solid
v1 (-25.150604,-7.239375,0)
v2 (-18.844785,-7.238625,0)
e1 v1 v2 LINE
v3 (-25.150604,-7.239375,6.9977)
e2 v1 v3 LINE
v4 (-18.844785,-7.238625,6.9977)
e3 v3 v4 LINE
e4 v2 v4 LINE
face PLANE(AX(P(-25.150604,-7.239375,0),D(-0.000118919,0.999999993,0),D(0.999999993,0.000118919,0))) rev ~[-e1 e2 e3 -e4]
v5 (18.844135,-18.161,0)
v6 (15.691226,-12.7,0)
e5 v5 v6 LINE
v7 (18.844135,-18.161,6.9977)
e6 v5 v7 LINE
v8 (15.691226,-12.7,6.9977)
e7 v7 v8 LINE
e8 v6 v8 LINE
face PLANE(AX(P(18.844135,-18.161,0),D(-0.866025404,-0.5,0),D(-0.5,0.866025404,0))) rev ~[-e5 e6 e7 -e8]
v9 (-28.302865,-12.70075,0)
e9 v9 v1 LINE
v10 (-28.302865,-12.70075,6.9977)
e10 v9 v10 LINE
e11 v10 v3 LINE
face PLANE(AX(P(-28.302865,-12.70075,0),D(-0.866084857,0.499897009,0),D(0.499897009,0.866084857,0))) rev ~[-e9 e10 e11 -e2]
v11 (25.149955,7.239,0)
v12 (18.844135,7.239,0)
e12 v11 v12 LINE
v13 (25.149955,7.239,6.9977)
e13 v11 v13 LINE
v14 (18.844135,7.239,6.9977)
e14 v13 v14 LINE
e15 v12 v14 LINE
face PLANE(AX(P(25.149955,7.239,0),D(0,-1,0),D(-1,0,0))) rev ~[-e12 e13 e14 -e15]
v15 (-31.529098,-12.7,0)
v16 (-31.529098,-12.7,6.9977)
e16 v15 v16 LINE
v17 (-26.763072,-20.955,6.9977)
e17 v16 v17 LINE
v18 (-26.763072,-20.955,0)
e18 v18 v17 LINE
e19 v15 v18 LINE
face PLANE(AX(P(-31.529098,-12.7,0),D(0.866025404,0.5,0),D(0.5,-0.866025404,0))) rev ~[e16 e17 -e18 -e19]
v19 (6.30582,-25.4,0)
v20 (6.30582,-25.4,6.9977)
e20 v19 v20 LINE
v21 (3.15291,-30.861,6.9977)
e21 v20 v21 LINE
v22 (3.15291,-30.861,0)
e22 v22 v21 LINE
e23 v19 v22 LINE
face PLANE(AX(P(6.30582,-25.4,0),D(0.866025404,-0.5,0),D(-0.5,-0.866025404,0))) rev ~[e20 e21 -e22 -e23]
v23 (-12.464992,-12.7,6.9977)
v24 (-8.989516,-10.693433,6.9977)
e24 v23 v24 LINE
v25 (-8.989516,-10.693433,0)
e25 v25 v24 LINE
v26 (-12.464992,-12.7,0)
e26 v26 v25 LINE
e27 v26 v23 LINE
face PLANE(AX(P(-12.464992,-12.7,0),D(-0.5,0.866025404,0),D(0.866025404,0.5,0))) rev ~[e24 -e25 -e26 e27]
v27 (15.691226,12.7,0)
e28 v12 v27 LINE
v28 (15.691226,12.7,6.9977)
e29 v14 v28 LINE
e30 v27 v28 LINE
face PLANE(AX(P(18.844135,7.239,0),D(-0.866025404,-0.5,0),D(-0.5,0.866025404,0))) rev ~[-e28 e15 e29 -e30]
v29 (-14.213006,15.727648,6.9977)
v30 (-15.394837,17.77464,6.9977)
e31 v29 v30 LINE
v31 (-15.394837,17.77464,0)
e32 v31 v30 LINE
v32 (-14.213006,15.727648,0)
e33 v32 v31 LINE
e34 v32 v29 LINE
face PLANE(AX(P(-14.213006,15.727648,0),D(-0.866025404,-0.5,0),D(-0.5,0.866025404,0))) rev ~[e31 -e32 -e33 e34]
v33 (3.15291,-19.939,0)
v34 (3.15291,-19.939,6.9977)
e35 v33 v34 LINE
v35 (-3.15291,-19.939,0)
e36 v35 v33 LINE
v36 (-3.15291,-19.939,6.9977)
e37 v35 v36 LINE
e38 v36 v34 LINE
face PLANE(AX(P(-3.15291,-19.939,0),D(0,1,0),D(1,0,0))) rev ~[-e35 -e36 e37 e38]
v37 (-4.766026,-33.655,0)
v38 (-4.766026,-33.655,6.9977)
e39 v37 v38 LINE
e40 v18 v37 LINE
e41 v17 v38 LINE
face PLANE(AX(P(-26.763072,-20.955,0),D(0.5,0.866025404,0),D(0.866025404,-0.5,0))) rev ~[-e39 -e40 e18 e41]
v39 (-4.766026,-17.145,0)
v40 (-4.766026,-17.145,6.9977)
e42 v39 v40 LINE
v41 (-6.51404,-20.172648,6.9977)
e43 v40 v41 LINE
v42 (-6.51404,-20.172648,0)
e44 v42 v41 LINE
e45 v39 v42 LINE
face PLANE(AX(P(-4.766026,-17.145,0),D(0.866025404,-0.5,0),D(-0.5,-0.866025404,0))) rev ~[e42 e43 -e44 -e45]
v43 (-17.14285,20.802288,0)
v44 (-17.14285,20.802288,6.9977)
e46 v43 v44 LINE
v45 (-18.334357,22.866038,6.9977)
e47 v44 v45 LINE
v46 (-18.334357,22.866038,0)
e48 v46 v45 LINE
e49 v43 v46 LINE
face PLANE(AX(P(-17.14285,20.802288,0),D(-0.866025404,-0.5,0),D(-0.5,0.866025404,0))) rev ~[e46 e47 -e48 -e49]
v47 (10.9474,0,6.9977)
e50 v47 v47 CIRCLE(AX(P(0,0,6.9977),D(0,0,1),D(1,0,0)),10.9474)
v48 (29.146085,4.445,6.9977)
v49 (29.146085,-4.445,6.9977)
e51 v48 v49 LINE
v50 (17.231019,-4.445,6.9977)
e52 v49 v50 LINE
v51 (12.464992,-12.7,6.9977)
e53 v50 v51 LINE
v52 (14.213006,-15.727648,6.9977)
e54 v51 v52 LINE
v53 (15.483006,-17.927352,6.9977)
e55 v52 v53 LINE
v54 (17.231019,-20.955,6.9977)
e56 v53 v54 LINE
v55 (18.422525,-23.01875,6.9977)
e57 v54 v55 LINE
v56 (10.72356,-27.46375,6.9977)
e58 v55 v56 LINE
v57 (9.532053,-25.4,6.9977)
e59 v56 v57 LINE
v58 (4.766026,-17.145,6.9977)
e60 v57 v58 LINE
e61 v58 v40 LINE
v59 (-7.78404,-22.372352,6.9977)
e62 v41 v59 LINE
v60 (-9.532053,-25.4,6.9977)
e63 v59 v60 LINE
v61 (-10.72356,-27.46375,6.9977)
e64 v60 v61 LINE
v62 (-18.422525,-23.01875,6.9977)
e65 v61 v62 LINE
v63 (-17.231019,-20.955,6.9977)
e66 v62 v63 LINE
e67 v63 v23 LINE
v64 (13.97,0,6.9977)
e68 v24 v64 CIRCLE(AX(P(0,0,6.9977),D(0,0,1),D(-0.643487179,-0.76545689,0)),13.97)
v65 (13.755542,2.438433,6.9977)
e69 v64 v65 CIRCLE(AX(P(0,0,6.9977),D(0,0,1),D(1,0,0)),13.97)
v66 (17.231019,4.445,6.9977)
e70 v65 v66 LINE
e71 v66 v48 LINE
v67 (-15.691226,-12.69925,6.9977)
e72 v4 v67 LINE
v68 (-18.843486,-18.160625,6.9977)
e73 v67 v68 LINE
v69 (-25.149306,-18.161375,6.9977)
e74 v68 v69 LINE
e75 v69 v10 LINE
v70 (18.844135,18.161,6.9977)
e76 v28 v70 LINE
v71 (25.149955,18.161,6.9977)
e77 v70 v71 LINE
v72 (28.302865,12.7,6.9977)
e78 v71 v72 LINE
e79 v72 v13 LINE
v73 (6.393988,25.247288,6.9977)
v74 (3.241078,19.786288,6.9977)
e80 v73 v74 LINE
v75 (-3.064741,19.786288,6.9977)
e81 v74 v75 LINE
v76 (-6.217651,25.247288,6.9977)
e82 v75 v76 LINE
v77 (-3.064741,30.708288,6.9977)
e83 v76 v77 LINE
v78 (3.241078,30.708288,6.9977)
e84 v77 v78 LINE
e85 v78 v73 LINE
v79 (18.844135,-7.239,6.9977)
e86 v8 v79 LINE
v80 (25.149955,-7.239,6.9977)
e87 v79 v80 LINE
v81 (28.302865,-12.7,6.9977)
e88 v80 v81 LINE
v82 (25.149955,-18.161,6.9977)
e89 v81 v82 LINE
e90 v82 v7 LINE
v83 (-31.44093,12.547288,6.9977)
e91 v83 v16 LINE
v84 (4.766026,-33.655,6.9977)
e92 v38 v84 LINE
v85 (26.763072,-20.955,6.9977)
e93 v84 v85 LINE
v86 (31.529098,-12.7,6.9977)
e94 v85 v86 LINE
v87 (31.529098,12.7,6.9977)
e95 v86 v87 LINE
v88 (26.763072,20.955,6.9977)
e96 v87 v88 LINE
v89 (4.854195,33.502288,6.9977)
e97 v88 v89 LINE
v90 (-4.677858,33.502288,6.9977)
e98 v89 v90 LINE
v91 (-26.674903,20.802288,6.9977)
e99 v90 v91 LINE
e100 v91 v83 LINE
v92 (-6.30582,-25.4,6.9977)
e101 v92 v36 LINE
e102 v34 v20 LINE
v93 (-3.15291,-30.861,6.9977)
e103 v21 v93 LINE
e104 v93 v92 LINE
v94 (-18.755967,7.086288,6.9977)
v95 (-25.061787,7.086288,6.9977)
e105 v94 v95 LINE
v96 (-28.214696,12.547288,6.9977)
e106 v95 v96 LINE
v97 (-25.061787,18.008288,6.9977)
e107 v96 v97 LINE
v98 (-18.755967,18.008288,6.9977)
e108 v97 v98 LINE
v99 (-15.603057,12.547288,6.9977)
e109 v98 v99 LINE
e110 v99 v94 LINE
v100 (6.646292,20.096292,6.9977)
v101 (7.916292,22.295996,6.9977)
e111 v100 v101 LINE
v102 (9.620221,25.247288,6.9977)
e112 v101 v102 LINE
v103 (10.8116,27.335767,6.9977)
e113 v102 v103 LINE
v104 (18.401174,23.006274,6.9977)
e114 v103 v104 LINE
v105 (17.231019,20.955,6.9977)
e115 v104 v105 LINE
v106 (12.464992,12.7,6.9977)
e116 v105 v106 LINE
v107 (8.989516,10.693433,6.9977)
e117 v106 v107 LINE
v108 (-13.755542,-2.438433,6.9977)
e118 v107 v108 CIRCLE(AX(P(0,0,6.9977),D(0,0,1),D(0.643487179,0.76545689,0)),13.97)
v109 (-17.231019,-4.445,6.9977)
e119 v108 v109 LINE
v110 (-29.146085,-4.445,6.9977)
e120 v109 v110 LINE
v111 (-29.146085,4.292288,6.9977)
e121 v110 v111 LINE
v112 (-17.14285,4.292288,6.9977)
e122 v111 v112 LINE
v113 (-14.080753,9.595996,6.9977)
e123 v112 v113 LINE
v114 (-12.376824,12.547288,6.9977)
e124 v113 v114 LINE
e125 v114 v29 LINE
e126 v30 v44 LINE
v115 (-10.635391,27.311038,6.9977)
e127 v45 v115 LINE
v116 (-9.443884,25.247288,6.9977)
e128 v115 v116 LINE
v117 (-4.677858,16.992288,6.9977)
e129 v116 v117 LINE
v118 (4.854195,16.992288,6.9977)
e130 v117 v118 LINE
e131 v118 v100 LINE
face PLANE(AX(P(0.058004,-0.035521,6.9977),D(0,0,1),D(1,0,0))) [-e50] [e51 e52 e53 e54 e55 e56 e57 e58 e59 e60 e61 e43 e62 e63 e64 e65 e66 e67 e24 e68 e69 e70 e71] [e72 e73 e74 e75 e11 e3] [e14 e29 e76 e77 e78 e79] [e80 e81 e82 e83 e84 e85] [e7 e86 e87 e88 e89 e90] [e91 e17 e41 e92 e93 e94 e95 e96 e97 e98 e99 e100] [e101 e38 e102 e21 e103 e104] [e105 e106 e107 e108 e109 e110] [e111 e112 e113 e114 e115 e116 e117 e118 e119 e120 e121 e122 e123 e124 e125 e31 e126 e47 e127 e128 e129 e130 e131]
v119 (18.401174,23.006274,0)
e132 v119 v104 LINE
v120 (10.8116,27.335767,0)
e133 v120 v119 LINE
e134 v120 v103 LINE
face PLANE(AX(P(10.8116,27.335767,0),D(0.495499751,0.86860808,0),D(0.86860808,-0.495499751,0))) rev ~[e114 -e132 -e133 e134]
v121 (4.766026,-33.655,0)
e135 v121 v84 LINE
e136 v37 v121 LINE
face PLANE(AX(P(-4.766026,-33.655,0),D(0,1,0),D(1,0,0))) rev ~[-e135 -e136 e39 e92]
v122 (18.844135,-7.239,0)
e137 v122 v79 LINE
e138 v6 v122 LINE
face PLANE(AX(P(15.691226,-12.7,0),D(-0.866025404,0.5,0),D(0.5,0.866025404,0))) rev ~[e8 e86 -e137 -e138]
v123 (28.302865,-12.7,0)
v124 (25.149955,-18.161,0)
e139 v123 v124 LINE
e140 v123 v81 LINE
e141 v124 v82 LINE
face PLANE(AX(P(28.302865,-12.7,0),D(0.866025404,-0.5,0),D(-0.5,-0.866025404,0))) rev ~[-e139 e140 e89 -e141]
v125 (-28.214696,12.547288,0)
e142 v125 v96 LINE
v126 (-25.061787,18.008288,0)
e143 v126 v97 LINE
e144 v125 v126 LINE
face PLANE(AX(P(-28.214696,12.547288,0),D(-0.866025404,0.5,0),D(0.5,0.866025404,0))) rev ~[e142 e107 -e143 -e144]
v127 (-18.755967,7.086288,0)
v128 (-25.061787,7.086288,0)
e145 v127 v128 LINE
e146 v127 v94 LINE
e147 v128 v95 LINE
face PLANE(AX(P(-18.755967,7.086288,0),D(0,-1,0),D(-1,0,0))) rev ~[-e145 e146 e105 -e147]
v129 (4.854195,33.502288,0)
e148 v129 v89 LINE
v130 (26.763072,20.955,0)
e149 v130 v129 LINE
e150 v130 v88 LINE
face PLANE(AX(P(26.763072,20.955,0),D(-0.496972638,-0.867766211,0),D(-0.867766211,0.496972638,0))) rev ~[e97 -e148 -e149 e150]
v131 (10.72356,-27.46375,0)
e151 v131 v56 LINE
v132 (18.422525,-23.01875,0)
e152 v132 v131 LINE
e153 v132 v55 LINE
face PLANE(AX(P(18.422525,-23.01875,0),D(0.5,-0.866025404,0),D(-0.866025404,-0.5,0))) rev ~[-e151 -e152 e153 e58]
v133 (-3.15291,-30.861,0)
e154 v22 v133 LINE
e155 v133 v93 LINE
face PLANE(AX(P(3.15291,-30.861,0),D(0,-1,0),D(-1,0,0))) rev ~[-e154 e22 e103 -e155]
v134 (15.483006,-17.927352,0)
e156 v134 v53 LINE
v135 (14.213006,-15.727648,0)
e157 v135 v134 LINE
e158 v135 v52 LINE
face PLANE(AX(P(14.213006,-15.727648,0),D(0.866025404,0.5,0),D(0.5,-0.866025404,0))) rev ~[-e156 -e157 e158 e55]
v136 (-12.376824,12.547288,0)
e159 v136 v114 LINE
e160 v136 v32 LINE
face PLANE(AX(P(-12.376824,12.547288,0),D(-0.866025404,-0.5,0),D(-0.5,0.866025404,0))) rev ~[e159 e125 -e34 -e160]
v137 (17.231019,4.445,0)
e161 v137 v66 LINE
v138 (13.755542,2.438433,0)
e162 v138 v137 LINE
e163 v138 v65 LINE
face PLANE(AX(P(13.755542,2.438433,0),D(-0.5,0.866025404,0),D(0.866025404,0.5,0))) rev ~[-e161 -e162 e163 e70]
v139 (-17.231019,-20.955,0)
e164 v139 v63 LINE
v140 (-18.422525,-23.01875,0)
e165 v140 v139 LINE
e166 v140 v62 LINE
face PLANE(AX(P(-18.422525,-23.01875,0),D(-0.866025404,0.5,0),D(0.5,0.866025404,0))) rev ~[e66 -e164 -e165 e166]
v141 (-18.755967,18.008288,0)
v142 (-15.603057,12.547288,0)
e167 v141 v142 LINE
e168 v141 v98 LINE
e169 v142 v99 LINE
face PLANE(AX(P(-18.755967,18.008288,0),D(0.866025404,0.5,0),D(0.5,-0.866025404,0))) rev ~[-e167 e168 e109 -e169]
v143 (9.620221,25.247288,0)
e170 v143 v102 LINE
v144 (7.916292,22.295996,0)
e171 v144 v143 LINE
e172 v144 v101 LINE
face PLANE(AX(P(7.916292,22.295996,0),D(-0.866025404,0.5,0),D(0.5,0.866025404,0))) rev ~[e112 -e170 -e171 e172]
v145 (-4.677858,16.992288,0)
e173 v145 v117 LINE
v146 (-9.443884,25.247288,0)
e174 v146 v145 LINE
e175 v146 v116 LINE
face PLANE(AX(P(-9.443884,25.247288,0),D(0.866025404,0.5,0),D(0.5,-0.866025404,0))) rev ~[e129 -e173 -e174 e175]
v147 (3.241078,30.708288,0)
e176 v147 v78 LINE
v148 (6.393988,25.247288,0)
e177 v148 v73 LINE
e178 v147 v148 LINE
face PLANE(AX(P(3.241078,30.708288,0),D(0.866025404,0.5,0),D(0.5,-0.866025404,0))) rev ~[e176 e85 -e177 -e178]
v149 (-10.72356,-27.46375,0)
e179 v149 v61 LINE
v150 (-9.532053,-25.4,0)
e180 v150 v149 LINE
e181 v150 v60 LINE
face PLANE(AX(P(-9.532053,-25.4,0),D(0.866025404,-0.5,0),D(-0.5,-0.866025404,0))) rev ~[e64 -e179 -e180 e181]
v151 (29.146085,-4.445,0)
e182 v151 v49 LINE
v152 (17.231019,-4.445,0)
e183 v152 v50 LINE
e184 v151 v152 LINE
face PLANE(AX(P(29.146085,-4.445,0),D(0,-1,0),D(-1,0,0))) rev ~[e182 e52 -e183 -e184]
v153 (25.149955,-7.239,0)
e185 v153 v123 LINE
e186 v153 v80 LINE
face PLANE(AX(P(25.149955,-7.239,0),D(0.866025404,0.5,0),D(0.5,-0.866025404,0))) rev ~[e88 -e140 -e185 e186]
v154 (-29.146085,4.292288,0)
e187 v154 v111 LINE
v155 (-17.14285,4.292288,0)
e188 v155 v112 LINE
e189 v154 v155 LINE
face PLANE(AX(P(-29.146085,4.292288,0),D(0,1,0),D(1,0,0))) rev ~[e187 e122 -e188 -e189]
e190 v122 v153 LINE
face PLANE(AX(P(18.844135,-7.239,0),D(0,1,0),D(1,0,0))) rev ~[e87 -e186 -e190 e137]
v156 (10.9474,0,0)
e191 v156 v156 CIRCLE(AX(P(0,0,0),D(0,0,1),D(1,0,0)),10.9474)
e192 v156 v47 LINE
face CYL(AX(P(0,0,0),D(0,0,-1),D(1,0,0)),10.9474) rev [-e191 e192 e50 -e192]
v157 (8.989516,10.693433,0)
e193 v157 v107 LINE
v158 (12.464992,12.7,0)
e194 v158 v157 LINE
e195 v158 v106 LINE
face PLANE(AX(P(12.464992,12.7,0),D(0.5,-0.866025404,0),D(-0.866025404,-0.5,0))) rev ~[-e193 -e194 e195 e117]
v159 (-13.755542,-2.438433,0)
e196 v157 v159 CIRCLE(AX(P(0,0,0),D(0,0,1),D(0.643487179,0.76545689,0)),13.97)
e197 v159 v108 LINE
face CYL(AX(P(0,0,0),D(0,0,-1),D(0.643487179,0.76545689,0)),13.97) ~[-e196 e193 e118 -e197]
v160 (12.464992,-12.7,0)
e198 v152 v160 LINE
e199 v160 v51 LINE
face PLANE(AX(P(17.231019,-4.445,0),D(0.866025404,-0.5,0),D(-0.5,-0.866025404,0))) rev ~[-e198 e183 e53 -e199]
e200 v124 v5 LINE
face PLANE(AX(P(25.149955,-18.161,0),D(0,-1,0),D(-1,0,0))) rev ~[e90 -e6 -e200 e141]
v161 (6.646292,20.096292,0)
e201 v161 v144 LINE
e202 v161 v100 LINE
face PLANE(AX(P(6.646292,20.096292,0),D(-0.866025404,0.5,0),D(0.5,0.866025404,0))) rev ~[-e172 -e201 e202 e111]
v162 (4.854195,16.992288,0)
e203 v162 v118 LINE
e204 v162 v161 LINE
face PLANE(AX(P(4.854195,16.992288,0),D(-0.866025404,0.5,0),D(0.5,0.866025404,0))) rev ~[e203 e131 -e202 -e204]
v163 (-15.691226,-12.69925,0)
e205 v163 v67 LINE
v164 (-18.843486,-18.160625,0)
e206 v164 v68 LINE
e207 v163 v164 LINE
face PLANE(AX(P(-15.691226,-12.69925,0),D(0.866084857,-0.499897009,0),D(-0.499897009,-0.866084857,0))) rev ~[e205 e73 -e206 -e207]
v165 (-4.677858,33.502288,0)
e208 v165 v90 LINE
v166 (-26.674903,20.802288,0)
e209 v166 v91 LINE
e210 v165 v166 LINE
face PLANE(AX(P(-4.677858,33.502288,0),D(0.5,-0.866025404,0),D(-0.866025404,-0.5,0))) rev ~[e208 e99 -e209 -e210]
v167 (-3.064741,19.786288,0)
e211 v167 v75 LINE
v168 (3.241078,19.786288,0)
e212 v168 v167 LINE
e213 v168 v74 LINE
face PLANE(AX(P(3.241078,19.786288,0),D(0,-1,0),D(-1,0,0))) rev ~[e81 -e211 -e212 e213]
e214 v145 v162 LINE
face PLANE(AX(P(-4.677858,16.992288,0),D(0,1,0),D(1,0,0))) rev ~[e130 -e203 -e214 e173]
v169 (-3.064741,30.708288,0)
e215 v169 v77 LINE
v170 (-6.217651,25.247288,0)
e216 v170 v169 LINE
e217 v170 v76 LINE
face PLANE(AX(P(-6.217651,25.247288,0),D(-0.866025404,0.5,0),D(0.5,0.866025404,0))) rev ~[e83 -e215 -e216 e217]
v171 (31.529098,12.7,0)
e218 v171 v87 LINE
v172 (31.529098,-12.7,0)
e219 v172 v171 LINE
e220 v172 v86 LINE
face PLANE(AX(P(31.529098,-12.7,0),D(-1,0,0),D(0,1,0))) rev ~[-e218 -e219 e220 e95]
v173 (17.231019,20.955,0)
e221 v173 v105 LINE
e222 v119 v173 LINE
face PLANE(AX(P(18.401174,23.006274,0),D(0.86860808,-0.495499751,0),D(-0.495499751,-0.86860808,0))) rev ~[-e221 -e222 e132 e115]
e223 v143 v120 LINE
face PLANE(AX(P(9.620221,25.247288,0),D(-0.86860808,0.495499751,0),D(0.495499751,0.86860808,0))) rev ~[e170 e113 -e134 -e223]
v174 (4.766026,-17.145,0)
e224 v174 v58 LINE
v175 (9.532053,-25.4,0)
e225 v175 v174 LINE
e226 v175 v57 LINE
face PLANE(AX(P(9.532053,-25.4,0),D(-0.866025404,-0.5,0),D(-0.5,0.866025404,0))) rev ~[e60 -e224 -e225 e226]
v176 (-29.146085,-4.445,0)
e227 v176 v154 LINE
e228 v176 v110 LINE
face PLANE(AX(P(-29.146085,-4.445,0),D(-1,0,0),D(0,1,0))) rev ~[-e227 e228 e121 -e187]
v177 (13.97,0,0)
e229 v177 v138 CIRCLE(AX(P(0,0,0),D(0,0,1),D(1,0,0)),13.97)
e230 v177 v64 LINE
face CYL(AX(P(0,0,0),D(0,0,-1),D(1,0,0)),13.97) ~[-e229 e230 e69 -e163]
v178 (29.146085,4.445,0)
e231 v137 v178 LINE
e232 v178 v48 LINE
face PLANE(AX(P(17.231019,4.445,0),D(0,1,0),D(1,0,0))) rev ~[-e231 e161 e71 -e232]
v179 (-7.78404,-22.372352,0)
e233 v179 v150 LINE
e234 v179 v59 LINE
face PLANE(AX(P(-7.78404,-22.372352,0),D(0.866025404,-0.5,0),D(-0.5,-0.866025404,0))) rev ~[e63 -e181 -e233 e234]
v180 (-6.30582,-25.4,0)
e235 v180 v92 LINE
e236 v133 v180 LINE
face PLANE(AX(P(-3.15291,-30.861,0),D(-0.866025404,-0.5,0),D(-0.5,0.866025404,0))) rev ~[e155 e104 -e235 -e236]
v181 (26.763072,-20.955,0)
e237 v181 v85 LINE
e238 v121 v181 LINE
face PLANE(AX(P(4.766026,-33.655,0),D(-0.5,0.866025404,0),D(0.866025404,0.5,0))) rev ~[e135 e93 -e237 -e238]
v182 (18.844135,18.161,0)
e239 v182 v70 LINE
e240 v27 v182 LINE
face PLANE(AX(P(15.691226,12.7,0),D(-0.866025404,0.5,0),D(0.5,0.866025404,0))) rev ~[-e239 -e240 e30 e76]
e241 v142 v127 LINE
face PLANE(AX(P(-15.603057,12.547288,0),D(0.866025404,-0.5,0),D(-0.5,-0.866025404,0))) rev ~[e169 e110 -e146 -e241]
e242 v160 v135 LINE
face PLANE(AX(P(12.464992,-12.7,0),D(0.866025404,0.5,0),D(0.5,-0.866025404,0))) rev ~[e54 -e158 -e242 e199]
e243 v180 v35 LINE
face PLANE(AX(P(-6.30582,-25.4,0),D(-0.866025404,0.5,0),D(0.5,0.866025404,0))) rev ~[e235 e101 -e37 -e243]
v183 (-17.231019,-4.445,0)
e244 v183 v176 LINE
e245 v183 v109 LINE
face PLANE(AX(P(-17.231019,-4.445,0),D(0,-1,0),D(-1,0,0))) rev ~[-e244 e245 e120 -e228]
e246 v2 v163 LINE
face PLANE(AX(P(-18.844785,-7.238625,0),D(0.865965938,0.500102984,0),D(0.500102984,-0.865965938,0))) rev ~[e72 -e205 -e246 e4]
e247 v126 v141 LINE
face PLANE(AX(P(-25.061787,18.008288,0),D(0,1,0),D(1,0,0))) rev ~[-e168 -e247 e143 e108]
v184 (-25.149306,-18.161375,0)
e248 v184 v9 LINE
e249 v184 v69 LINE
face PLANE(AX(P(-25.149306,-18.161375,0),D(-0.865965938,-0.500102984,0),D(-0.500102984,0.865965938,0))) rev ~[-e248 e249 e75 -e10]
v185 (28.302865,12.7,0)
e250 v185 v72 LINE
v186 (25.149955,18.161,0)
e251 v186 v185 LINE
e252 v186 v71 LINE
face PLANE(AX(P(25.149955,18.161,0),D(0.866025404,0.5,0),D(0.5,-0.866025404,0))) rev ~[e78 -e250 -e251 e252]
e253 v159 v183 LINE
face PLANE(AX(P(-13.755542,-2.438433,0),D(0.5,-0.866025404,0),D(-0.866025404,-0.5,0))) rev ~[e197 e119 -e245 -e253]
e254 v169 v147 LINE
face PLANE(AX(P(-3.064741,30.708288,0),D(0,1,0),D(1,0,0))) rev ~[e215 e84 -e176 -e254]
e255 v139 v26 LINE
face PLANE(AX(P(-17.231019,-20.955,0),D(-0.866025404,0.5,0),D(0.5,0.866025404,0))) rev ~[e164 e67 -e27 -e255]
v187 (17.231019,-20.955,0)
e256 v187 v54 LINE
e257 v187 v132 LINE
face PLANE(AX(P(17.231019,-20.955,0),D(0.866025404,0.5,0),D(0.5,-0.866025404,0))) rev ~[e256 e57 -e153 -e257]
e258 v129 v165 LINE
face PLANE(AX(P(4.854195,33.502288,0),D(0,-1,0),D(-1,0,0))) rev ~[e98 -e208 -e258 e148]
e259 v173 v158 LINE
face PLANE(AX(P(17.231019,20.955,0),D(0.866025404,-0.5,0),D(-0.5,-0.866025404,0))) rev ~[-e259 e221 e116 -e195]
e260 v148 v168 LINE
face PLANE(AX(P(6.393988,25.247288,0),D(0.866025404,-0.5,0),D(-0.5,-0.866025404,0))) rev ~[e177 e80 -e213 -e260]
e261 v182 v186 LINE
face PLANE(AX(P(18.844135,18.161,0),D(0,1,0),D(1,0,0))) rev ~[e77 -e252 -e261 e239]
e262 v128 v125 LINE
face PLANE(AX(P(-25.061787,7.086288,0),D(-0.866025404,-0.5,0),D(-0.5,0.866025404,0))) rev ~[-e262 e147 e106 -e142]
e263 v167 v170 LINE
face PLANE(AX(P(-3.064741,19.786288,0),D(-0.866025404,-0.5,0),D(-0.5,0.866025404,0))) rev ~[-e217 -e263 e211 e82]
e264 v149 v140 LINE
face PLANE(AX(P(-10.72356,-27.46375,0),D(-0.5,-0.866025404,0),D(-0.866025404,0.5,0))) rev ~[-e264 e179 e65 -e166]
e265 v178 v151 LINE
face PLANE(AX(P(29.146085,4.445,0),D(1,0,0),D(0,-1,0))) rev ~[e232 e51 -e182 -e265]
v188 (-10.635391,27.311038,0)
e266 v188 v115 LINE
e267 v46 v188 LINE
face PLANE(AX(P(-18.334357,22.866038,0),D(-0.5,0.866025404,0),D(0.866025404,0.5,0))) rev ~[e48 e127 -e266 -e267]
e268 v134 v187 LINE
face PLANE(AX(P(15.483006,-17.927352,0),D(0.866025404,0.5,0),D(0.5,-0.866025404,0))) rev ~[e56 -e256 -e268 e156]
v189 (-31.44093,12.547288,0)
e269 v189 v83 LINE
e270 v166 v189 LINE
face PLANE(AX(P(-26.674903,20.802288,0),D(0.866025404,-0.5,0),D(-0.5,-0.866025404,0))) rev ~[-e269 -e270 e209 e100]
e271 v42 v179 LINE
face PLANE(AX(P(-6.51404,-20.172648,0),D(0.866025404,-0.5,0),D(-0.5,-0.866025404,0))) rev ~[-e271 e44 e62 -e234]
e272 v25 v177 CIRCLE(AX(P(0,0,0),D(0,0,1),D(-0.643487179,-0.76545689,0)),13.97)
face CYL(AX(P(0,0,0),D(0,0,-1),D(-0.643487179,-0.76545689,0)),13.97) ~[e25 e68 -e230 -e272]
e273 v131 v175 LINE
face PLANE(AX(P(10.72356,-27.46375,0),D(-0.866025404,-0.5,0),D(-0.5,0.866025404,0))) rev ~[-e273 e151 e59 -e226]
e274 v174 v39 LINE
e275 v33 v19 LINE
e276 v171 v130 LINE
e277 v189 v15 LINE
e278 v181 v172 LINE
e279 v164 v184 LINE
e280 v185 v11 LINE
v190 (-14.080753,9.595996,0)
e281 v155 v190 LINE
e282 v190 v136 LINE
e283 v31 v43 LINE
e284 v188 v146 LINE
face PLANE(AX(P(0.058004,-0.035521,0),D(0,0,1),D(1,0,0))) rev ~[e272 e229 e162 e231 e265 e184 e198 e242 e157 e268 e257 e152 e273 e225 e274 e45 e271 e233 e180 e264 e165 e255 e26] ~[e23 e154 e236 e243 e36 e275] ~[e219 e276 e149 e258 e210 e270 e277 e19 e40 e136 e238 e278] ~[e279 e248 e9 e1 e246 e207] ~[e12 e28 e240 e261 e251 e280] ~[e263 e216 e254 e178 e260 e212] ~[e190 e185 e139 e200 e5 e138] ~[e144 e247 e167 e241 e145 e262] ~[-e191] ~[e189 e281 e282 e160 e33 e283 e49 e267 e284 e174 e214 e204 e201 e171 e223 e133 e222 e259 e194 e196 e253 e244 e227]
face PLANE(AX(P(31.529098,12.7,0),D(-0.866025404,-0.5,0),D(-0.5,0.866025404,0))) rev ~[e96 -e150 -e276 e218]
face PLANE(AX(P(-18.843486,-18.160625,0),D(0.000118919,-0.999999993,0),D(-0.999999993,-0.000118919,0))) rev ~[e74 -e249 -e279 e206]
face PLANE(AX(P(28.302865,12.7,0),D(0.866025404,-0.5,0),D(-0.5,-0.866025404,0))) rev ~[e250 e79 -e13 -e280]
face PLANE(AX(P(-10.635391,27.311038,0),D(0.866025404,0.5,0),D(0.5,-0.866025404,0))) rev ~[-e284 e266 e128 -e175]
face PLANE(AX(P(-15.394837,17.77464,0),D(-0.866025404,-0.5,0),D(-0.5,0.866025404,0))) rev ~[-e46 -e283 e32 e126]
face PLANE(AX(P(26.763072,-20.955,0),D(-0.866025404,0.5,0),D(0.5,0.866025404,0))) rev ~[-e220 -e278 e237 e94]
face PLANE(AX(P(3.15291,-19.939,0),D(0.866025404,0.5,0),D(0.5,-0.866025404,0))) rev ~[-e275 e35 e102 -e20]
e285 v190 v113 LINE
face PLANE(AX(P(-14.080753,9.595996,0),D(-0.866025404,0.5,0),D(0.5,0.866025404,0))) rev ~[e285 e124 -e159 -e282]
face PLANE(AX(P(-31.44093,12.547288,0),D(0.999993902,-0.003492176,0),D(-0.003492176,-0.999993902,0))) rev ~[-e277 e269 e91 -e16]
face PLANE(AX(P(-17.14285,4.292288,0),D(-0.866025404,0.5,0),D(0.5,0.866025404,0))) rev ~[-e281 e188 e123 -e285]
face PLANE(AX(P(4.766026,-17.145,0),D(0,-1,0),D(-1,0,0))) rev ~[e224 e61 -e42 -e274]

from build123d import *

# Parameters (mm, degrees)
F0_R     = 11.0786603321
F0_R_2   = 10.9474
F1_DEPTH = 6.9977
F2_R     = 13.2854455685
F2_R_2   = 11.176
F3_DEPTH = 6.9977


# Not quite as in the source:
# - a feature names something its author has since deleted; it is built from what else it names


with BuildPart() as f1:
    # F0 (on Top) → F1 (new body)
    with BuildSketch(Plane.XY):
        with BuildLine():
            ThreePointArc((8.9895158912, 10.693432753), (-6.985, 12.0983748909), (-13.7555423633, -2.438432753))
            ThreePointArc((-13.7555423633, -2.438432753), (-12.0983748909, -6.985), (-8.9895158912, -10.693432753))
            ThreePointArc((-8.9895158912, -10.693432753), (5.8981930708, -12.6638153216), (13.97, 0))
            ThreePointArc((13.97, 0), (13.9162823127, 1.2239226251), (13.7555423633, 2.438432753))
            ThreePointArc((13.7555423633, 2.438432753), (13.347336888, 4.1242572662), (12.7333664349, 5.7465014779))
            ThreePointArc((12.7333664349, 5.7465014779), (11.139521372, 8.4304189458), (8.9895158912, 10.693432753))
        make_face()
        Circle(F0_R, mode=Mode.SUBTRACT)
        Circle(F0_R)
        Circle(F0_R_2, mode=Mode.SUBTRACT)
        Polygon((-14.0807527651, 9.595996083), (-12.3768237899, 12.5472876405), (-14.2130055479, 15.7276477372), (-15.394837026, 17.7746399033), (-17.1428502621, 20.8022876405), (-21.9088767342, 20.8022876405), (-26.6749032064, 20.8022876405), (-31.4409296786, 12.5472876405), (-29.1460849644, 8.5725), (-26.6749032064, 4.2922876405), (-17.1428502621, 4.2922876405), (-15.3507527651, 7.3962915574), align=None)
        Polygon((-18.7559669142, 18.0082876405), (-15.6030570942, 12.5472876405), (-18.7559669142, 7.0862876405), (-25.0617865543, 7.0862876405), (-28.2146963743, 12.5472876405), (-25.0617865543, 18.0082876405), align=None, mode=Mode.SUBTRACT)
        Polygon((4.854194994, 33.5022876405), (-4.6778579503, 33.5022876405), (-7.0608711864, 29.3747876405), (-9.4438844224, 25.2472876405), (-4.6778579503, 16.9922876405), (-1.27, 16.9922876405), (1.27, 16.9922876405), (4.854194994, 16.9922876405), (6.6462924911, 20.0962915574), (7.9162924911, 22.295996083), (9.6202214662, 25.2472876405), (7.2372082301, 29.3747876405), align=None)
        Polygon((6.393988162, 25.2472876405), (3.2410783419, 19.7862876405), (-3.0647412982, 19.7862876405), (-6.2176511182, 25.2472876405), (-3.0647412982, 30.7082876405), (3.2410783419, 30.7082876405), align=None, mode=Mode.SUBTRACT)
        Polygon((-29.1460849644, -8.5725), (-31.5290982004, -12.7), (-26.7630717283, -20.955), (-21.9970452561, -20.955), (-17.231018784, -20.955), (-12.4649923118, -12.7), (-14.2130055479, -9.6723522628), (-15.4830055479, -7.4726477372), (-17.231018784, -4.445), (-20.7270452561, -4.445), (-23.2670452561, -4.445), (-26.7630717283, -4.445), align=None)
        Polygon((-25.150604473, -7.2393749809), (-18.8447848775, -7.2386250963), (-15.6912256606, -12.6992501153), (-18.8434860392, -18.1606250191), (-25.1493056347, -18.1613749037), (-28.3028648516, -12.7007498847), align=None, mode=Mode.SUBTRACT)
        Polygon((31.5290982004, 12.7), (26.7630717283, 20.955), (21.9970452561, 20.955), (17.231018784, 20.955), (12.4649923118, 12.7), (14.2130055479, 9.6723522628), (15.4830055479, 7.4726477372), (17.231018784, 4.445), (20.7270452561, 4.445), (23.2670452561, 4.445), (26.7630717283, 4.445), (29.1460849644, 8.5725), align=None)
        Polygon((25.1499550762, 7.239), (18.8441354361, 7.239), (15.691225616, 12.7), (18.8441354361, 18.161), (25.1499550762, 18.161), (28.3028648962, 12.7), align=None, mode=Mode.SUBTRACT)
        Polygon((-7.1490397082, -29.5275), (-4.7660264722, -33.655), (4.7660264722, -33.655), (7.1490397082, -29.5275), (9.5320529443, -25.4), (4.7660264722, -17.145), (1.27, -17.145), (-1.27, -17.145), (-4.7660264722, -17.145), (-6.5140397082, -20.1726477372), (-7.7840397082, -22.3723522628), (-9.5320529443, -25.4), align=None)
        Polygon((-6.3058196401, -25.4), (-3.15290982, -19.939), (3.15290982, -19.939), (6.3058196401, -25.4), (3.15290982, -30.861), (-3.15290982, -30.861), align=None, mode=Mode.SUBTRACT)
        Polygon((26.7630717283, -20.955), (31.5290982004, -12.7), (29.1460849644, -8.5725), (26.7630717283, -4.445), (17.231018784, -4.445), (12.4649923118, -12.7), (14.2130055479, -15.7276477372), (15.4830055479, -17.9273522628), (17.231018784, -20.955), (21.9970452561, -20.955), align=None)
        Polygon((18.8441354361, -18.161), (15.691225616, -12.7), (18.8441354361, -7.239), (25.1499550762, -7.239), (28.3028648962, -12.7), (25.1499550762, -18.161), align=None, mode=Mode.SUBTRACT)
        Polygon((-26.6749032064, 20.8022876405), (-21.9088767342, 20.8022876405), (-18.3343568801, 22.8660376405), (-10.6353910405, 27.3110376405), (-7.0608711864, 29.3747876405), (-4.6778579503, 33.5022876405), align=None)
        Polygon((-21.9970452561, -20.955), (-26.7630717283, -20.955), (-4.7660264722, -33.655), (-7.1490397082, -29.5275), (-10.7235595624, -27.46375), (-18.422525402, -23.01875), align=None)
        Polygon((31.5290982004, -12.7), (31.5290982004, 12.7), (29.1460849644, 8.5725), (29.1460849644, 4.445), (29.1460849644, -4.445), (29.1460849644, -8.5725), align=None)
        Polygon((7.1490397082, -29.5275), (4.7660264722, -33.655), (26.7630717283, -20.955), (21.9970452561, -20.955), (18.422525402, -23.01875), (10.7235595624, -27.46375), align=None)
        Polygon((26.7630717283, 20.955), (4.854194994, 33.5022876405), (7.2372082301, 29.3747876405), (10.811599772, 27.3357666355), (18.4011736203, 23.0062743808), (21.9970452561, 20.955), align=None)
        Polygon((-29.1460849644, 4.2922876405), (-29.1460849644, 8.5725), (-31.4409296786, 12.5472876405), (-31.5290982004, -12.7), (-29.1460849644, -8.5725), (-29.1460849644, -4.445), align=None)
        with BuildLine():
            Line((-13.7555423633, -2.438432753), (-17.231018784, -4.445))
            Line((-17.231018784, -4.445), (-15.4830055479, -7.4726477372))
            Line((-15.4830055479, -7.4726477372), (-14.2130055479, -9.6723522628))
            Line((-14.2130055479, -9.6723522628), (-12.4649923118, -12.7))
            Line((-12.4649923118, -12.7), (-8.9895158912, -10.693432753))
            ThreePointArc((-8.9895158912, -10.693432753), (-12.0983748909, -6.985), (-13.7555423633, -2.438432753))
        make_face()
        with BuildLine():
            Line((14.2130055479, 9.6723522628), (12.4649923118, 12.7))
            Line((12.4649923118, 12.7), (8.9895158912, 10.693432753))
            ThreePointArc((8.9895158912, 10.693432753), (11.139521372, 8.4304189458), (12.7333664349, 5.7465014779))
            ThreePointArc((12.7333664349, 5.7465014779), (13.347336888, 4.1242572662), (13.7555423633, 2.438432753))
            Line((13.7555423633, 2.438432753), (17.231018784, 4.445))
            Line((17.231018784, 4.445), (15.4830055479, 7.4726477372))
            Line((15.4830055479, 7.4726477372), (14.2130055479, 9.6723522628))
        make_face()
        Polygon((-29.1460849644, 4.2922876405), (-26.6749032064, 4.2922876405), (-29.1460849644, 8.5725), align=None)
        Polygon((10.811599772, 27.3357666355), (7.2372082301, 29.3747876405), (9.6202214662, 25.2472876405), align=None)
        Polygon((-21.9088767342, 20.8022876405), (-17.1428502621, 20.8022876405), (-18.3343568801, 22.8660376405), align=None)
        Polygon((-7.0608711864, 29.3747876405), (-10.6353910405, 27.3110376405), (-9.4438844224, 25.2472876405), align=None)
        Polygon((29.1460849644, 4.445), (29.1460849644, 8.5725), (26.7630717283, 4.445), align=None)
        Polygon((26.7630717283, -4.445), (29.1460849644, -8.5725), (29.1460849644, -4.445), align=None)
        Polygon((18.422525402, -23.01875), (21.9970452561, -20.955), (17.231018784, -20.955), align=None)
        Polygon((9.5320529443, -25.4), (7.1490397082, -29.5275), (10.7235595624, -27.46375), align=None)
        Polygon((-10.7235595624, -27.46375), (-7.1490397082, -29.5275), (-9.5320529443, -25.4), align=None)
        Polygon((-17.231018784, -20.955), (-21.9970452561, -20.955), (-18.422525402, -23.01875), align=None)
        Polygon((-26.7630717283, -4.445), (-29.1460849644, -4.445), (-29.1460849644, -8.5725), align=None)
        Polygon((17.231018784, 20.955), (21.9970452561, 20.955), (18.4011736203, 23.0062743808), align=None)
    extrude(amount=F1_DEPTH)

    # F2 (on Top) → F3 (join)
    with BuildSketch(Plane.XY):
        Circle(F2_R)
        Circle(F2_R_2, mode=Mode.SUBTRACT)
    extrude(amount=F3_DEPTH)


solid = f1.part
